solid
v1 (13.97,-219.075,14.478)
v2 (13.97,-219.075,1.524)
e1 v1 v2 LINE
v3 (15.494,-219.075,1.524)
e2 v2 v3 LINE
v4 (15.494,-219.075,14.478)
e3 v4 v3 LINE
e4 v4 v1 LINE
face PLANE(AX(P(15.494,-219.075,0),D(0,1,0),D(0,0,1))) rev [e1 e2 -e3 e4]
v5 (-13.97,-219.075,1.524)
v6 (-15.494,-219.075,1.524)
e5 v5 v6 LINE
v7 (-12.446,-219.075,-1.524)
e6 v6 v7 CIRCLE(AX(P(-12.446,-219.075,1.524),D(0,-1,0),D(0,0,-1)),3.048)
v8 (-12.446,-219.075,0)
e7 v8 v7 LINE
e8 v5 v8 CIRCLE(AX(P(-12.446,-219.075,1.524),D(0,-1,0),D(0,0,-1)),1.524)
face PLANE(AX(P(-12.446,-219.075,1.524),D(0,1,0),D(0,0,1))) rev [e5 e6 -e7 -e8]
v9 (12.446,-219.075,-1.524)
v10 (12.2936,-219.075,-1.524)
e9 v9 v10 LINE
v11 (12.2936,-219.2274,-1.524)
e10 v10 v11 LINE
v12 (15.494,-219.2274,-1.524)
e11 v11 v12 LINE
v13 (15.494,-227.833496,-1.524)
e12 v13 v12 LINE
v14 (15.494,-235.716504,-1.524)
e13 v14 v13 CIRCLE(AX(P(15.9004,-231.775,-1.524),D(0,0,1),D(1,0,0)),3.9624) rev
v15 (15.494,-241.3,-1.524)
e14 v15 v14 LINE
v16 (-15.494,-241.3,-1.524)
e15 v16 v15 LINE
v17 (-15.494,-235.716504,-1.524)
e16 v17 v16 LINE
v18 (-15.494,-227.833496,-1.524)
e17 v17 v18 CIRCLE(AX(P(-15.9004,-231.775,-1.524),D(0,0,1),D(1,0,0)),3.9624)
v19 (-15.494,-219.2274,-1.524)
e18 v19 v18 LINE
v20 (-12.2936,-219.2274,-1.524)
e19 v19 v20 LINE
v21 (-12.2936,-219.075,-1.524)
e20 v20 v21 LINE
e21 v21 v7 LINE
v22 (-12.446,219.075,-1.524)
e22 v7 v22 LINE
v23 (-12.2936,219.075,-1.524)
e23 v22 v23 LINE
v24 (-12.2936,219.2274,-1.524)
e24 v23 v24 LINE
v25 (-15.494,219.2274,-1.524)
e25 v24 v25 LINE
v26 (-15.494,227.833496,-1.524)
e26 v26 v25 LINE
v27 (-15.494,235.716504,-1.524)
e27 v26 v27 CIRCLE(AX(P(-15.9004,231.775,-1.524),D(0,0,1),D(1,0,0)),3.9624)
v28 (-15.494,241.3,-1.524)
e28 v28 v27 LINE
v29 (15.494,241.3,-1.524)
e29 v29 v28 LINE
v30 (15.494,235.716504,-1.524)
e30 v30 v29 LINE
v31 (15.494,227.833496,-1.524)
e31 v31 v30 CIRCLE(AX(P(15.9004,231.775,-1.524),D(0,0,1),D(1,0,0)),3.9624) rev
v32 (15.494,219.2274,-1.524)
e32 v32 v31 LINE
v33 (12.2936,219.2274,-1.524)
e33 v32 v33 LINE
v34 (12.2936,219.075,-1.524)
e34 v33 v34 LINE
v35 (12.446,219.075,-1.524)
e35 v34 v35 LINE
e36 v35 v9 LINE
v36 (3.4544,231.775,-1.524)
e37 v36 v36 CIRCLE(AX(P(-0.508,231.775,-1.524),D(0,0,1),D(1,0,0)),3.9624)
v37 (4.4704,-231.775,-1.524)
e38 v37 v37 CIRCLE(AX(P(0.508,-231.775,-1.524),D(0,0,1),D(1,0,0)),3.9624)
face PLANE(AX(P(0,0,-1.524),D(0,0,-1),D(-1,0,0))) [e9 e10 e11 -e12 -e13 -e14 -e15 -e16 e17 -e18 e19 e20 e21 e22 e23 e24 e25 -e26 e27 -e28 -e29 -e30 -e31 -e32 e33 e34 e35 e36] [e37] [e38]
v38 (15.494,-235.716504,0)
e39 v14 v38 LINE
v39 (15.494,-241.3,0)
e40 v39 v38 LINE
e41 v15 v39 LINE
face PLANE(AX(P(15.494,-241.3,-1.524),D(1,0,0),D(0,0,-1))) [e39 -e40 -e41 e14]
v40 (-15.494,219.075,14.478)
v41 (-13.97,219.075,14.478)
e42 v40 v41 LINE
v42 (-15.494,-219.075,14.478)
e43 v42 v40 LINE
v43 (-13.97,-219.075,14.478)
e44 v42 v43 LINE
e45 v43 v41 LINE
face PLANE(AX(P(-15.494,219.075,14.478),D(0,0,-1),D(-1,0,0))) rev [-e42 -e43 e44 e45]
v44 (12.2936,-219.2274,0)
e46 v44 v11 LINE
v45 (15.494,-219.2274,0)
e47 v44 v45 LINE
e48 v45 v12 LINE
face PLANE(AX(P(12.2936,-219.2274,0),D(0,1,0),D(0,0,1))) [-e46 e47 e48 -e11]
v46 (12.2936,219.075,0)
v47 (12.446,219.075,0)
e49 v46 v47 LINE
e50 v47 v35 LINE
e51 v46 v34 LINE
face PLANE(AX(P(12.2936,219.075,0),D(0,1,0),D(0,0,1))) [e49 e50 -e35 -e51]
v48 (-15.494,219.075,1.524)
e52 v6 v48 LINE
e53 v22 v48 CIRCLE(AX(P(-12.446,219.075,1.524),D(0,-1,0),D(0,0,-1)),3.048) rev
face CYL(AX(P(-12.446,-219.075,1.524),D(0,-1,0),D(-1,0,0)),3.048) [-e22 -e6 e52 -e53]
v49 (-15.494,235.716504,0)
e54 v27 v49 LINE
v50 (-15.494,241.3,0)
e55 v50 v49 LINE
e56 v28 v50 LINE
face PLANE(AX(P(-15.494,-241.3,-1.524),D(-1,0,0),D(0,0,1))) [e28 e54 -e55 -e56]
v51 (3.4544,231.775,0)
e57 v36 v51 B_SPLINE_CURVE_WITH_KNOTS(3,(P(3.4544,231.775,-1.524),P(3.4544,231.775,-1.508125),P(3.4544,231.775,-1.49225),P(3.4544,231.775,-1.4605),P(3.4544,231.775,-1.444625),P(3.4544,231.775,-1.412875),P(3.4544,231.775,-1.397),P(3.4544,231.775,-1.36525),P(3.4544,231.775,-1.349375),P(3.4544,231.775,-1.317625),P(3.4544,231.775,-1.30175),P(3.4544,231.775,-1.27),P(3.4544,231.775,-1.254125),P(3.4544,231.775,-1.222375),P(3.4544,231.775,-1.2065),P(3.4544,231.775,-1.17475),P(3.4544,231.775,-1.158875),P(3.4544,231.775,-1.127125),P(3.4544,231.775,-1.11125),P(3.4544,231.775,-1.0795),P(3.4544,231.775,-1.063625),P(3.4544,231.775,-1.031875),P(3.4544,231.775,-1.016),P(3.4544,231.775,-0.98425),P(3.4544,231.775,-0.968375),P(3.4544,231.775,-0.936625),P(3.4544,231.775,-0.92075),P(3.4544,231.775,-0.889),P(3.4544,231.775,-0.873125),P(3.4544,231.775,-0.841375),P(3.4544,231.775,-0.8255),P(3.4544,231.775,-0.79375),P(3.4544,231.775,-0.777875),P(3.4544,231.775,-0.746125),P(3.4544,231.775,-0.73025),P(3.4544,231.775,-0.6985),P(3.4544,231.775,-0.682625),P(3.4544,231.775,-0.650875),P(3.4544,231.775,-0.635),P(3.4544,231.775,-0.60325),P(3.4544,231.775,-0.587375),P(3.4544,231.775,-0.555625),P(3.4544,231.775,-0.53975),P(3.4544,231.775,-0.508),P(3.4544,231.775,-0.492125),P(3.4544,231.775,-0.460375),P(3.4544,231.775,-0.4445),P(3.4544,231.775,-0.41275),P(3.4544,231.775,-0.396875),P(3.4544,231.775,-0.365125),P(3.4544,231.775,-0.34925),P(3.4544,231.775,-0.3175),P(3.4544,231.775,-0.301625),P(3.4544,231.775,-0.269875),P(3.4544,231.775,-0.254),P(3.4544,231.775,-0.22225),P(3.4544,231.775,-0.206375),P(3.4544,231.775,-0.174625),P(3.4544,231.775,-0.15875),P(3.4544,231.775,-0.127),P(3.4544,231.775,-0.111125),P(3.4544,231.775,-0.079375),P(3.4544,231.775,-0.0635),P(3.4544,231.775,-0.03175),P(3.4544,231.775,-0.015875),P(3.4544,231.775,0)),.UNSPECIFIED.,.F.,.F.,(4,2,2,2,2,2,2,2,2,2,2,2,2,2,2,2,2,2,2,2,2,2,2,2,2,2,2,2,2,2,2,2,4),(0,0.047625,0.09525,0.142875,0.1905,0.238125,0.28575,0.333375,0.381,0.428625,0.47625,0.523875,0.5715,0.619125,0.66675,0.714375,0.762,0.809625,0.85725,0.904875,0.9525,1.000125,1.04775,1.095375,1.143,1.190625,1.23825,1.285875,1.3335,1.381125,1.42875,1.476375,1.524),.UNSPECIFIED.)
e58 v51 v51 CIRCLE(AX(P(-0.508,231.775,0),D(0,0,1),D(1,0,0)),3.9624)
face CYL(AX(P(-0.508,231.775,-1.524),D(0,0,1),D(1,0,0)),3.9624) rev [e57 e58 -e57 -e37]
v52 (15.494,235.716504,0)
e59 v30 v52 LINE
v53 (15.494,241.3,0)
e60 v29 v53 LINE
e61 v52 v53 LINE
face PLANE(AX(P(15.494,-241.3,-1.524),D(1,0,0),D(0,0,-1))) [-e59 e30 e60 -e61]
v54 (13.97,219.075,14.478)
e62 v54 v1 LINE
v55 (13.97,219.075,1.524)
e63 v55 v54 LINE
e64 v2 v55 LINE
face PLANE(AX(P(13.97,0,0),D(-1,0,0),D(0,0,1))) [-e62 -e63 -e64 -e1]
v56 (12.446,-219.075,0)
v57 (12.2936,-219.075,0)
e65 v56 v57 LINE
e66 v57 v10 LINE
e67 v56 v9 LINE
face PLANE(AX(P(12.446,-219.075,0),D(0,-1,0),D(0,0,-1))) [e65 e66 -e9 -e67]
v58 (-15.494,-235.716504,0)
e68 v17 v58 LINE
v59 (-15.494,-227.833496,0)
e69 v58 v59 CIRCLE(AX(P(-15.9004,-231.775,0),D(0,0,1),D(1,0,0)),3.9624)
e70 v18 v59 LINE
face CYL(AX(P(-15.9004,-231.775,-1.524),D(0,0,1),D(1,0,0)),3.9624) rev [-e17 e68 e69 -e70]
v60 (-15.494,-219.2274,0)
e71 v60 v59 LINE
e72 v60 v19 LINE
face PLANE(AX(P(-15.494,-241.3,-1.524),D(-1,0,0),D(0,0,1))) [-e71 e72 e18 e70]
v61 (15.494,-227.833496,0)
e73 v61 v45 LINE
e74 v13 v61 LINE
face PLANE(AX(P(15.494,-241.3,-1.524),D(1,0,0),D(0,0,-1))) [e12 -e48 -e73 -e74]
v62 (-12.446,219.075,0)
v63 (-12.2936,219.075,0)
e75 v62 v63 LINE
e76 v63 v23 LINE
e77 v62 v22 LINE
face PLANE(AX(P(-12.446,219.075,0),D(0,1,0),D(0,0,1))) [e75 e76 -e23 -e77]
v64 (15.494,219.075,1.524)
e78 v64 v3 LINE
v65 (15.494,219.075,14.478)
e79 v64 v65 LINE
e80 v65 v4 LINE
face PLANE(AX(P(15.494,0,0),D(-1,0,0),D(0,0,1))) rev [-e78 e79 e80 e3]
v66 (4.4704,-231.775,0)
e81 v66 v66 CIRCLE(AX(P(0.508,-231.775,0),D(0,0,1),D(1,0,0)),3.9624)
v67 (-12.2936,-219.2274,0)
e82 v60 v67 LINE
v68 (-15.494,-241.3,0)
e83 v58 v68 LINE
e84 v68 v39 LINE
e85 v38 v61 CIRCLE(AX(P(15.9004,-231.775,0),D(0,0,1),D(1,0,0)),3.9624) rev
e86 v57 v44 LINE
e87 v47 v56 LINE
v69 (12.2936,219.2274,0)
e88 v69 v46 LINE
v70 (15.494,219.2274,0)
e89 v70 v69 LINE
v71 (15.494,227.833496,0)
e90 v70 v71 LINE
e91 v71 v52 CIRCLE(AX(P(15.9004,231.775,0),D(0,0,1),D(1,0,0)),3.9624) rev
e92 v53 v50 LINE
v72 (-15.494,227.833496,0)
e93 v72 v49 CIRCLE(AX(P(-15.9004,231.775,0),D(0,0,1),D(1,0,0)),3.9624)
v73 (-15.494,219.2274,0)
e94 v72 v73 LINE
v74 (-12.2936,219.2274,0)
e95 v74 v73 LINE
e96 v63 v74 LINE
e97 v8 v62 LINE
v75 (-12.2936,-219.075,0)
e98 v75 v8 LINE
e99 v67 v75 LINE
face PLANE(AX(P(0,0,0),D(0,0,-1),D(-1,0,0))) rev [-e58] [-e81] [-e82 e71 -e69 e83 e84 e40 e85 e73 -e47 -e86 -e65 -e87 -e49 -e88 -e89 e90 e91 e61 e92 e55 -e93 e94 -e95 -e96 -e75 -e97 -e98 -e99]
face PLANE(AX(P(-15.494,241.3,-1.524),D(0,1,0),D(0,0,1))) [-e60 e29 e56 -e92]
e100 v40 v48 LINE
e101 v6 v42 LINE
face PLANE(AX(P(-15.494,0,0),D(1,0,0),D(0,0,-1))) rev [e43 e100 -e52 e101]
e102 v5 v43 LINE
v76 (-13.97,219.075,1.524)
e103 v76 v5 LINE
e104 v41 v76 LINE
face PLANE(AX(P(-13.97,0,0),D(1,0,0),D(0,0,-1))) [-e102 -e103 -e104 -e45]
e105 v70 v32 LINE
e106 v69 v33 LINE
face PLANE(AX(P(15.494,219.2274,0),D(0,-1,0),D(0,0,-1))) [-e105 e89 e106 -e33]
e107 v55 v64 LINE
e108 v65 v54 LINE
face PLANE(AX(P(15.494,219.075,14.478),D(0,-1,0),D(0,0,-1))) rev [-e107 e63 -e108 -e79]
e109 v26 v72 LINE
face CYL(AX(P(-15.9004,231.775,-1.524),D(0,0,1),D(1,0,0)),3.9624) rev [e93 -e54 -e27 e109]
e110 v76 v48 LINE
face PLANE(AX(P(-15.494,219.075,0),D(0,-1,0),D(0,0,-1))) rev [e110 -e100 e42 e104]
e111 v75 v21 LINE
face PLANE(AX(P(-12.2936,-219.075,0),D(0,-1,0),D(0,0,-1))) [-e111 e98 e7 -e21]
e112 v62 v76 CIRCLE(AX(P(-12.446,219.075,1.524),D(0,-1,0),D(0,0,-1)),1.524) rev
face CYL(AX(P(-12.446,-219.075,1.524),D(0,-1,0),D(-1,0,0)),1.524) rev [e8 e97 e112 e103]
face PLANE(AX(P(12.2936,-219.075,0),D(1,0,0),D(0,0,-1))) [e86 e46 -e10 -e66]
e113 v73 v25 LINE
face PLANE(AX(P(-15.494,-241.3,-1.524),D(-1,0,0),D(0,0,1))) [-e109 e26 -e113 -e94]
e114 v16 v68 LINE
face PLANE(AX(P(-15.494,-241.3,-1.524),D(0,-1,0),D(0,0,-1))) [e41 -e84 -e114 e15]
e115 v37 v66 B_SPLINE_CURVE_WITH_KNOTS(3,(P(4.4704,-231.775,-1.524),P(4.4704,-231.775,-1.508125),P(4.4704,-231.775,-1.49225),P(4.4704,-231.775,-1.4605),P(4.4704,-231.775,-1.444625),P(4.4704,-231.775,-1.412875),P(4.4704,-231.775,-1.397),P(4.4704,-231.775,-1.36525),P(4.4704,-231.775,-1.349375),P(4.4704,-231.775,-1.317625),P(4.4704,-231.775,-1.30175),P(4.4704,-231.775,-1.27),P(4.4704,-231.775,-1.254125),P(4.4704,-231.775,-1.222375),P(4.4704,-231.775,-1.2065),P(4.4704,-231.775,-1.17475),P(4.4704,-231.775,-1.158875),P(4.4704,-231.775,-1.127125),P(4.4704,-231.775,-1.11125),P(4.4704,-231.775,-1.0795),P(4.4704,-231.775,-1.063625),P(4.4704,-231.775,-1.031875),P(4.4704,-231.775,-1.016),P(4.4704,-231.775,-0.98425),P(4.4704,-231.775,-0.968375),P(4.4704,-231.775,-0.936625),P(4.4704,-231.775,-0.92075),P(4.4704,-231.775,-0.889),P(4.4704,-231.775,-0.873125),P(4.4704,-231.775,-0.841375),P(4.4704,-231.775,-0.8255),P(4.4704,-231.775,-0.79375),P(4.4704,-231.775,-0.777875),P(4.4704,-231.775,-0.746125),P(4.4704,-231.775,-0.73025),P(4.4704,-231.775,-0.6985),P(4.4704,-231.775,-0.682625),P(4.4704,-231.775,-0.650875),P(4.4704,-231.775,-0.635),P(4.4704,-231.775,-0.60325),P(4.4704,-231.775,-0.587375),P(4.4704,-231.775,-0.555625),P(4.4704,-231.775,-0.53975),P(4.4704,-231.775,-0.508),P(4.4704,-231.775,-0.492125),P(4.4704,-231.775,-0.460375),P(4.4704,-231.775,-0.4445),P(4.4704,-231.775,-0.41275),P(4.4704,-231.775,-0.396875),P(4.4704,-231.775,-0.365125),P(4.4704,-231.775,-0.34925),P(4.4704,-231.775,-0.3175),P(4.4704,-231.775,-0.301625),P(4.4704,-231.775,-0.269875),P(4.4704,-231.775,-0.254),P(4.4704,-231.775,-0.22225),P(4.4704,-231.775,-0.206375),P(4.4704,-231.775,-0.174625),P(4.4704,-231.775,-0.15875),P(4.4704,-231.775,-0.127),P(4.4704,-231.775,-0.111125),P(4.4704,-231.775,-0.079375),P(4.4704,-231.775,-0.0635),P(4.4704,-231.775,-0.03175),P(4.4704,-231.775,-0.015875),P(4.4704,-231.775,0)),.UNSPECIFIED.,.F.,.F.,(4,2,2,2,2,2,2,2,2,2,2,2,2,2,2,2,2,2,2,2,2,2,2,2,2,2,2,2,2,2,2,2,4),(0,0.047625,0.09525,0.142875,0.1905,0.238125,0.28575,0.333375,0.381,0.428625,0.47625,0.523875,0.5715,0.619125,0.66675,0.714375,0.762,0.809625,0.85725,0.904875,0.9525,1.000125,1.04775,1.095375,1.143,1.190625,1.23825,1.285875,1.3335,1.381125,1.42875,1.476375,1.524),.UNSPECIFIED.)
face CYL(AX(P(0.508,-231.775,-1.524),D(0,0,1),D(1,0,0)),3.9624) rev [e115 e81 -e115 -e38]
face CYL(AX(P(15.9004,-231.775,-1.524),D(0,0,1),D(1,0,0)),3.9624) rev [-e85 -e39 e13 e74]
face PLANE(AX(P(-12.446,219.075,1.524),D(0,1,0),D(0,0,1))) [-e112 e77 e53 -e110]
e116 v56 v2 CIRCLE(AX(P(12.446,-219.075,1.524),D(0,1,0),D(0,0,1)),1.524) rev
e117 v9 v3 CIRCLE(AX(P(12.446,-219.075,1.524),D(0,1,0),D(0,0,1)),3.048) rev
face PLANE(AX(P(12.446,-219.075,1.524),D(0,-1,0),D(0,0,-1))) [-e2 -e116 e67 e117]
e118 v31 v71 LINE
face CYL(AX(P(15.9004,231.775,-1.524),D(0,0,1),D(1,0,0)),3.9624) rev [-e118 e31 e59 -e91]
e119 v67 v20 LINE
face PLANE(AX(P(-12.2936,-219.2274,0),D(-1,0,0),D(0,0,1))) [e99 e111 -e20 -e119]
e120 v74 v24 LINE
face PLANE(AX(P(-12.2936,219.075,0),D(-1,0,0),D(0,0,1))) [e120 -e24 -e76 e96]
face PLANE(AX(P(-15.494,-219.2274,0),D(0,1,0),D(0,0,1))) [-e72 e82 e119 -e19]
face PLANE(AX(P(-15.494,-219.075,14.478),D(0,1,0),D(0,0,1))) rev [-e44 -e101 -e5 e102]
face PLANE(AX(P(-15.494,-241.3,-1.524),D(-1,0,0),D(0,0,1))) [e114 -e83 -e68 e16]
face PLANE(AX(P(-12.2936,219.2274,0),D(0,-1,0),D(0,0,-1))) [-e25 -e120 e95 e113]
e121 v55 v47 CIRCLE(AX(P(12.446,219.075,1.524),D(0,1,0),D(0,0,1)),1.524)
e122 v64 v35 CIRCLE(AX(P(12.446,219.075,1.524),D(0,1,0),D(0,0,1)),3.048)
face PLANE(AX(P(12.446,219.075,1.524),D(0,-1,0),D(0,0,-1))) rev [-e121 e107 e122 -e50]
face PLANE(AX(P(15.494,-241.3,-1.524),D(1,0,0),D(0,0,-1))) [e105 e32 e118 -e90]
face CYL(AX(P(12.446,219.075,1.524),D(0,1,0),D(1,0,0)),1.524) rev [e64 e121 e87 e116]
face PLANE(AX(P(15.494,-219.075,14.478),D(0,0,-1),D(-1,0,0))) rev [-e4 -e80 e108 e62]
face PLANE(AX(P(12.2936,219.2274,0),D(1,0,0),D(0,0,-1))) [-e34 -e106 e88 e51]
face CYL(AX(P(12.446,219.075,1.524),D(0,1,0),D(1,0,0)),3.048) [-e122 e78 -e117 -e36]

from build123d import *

# Parameters (mm, degrees)
CROQUIS1_W                          = 30.988
CROQUIS1_H                          = 482.6
CROQUIS1_R                          = 3.9624
BRIDA_BASE1_DEPTH                   = 1.524
BRIDA_DE_ARISTA1_STRIP_W            = 9.144
BRIDA_DE_ARISTA1_STRIP_H            = 1.524
BRIDA_DE_ARISTA1_STRIP_CUT_DEPTH    = 438.15
BRIDA_DE_ARISTA1_RELIEF_W           = 9.2964
BRIDA_DE_ARISTA1_RELIEF_H           = 0.1524
BRIDA_DE_ARISTA1_RELIEF_CUT_DEPTH   = 1.524
BRIDA_DE_ARISTA1_STRIP_2_W          = 9.144
BRIDA_DE_ARISTA1_STRIP_2_H          = 1.524
BRIDA_DE_ARISTA1_STRIP_CUT_2_DEPTH  = 438.15
BRIDA_DE_ARISTA1_RELIEF_2_W         = 9.2964
BRIDA_DE_ARISTA1_RELIEF_2_H         = 0.1524
BRIDA_DE_ARISTA1_RELIEF_CUT_2_DEPTH = 1.524
BRIDA_DE_ARISTA1_DEPTH              = 438.15
BRIDA_DE_ARISTA1_BEND_DEPTH         = 438.15
CROQUIS15_R                         = 3.9624
CORTAR_EXTRUIR1_DEPTH               = 243.229986831


# Sheet-metal steps are written as plain solids
with BuildPart() as part:
    # Croquis1 → Brida base1 (new body)
    with BuildSketch(Plane.XY):
        Rectangle(CROQUIS1_W, CROQUIS1_H)
        with Locations((-0.508, 231.775)):
            Circle(CROQUIS1_R, mode=Mode.SUBTRACT)
        with Locations((0.508, -231.775)):
            Circle(CROQUIS1_R, mode=Mode.SUBTRACT)
    extrude(amount=-BRIDA_BASE1_DEPTH)

    # Brida de arista1 strip (across the edge) → Brida de arista1 strip cut (cut)
    with BuildSketch(Plane(origin=(15.494, -219.075, 0), x_dir=(-1, 0, 0), z_dir=(0, 1, 0))):
        with Locations((-1.524, -0.762)):
            Rectangle(BRIDA_DE_ARISTA1_STRIP_W, BRIDA_DE_ARISTA1_STRIP_H)
    extrude(amount=BRIDA_DE_ARISTA1_STRIP_CUT_DEPTH, mode=Mode.SUBTRACT)

    # Brida de arista1 relief (on the sheet) → Brida de arista1 relief cut (cut)
    with BuildSketch(Plane(origin=(12.446, -219.075, 0), x_dir=(-1, 0, 0), z_dir=(0, 0, 1))):
        with Locations((-4.4958, 0.0762)):
            Rectangle(BRIDA_DE_ARISTA1_RELIEF_W, BRIDA_DE_ARISTA1_RELIEF_H)
        with Locations((-4.4958, -438.2262)):
            Rectangle(BRIDA_DE_ARISTA1_RELIEF_W, BRIDA_DE_ARISTA1_RELIEF_H)
    extrude(amount=-BRIDA_DE_ARISTA1_RELIEF_CUT_DEPTH, mode=Mode.SUBTRACT)

    # Brida de arista1 strip 2 (across the edge) → Brida de arista1 strip cut 2 (cut)
    with BuildSketch(Plane(origin=(-15.494, 219.075, 0), x_dir=(1, 0, 0), z_dir=(0, -1, 0))):
        with Locations((-1.524, -0.762)):
            Rectangle(BRIDA_DE_ARISTA1_STRIP_2_W, BRIDA_DE_ARISTA1_STRIP_2_H)
    extrude(amount=BRIDA_DE_ARISTA1_STRIP_CUT_2_DEPTH, mode=Mode.SUBTRACT)

    # Brida de arista1 relief 2 (on the sheet) → Brida de arista1 relief cut 2 (cut)
    with BuildSketch(Plane(origin=(-12.446, 219.075, 0), x_dir=(1, 0, 0), z_dir=(0, 0, 1))):
        with Locations((-4.4958, 0.0762)):
            Rectangle(BRIDA_DE_ARISTA1_RELIEF_2_W, BRIDA_DE_ARISTA1_RELIEF_2_H)
        with Locations((-4.4958, -438.2262)):
            Rectangle(BRIDA_DE_ARISTA1_RELIEF_2_W, BRIDA_DE_ARISTA1_RELIEF_2_H)
    extrude(amount=-BRIDA_DE_ARISTA1_RELIEF_CUT_2_DEPTH, mode=Mode.SUBTRACT)

    # Brida de arista1 section (across the edge) → Brida de arista1 (add)
    with BuildSketch(Plane(origin=(15.494, -219.075, 0), x_dir=(-1, 0, 0), z_dir=(0, 1, 0))):
        with BuildLine():
            Line((0, 1.524), (0, 14.478))
            Line((0, 14.478), (1.524, 14.478))
            Line((1.524, 14.478), (1.524, 1.524))
            ThreePointArc((1.524, 1.524), (1.970369265, 0.446369265), (3.048, 0))
            Line((3.048, 0), (3.048, -1.524))
            ThreePointArc((3.048, -1.524), (0.892738531, -0.631261469), (0, 1.524))
        make_face()
    extrude(amount=BRIDA_DE_ARISTA1_DEPTH)

    # Brida de arista1 section 2 (across the edge) → Brida de arista1 bend (add)
    with BuildSketch(Plane(origin=(-15.494, 219.075, 0), x_dir=(1, 0, 0), z_dir=(0, -1, 0))):
        with BuildLine():
            Line((0, 1.524), (0, 14.478))
            Line((0, 14.478), (1.524, 14.478))
            Line((1.524, 14.478), (1.524, 1.524))
            ThreePointArc((1.524, 1.524), (1.970369265, 0.446369265), (3.048, 0))
            Line((3.048, 0), (3.048, -1.524))
            ThreePointArc((3.048, -1.524), (0.892738531, -0.631261469), (0, 1.524))
        make_face()
    extrude(amount=BRIDA_DE_ARISTA1_BEND_DEPTH)

    # Croquis15 → Cortar-Extruir1 (cut, through all)
    with BuildSketch(Plane.XY):
        with Locations((-15.9004, 231.775)):
            Circle(CROQUIS15_R)
        with Locations((-15.9004, -231.775)):
            Circle(CROQUIS15_R)
        with Locations((15.9004, -231.775)):
            Circle(CROQUIS15_R)
        with Locations((15.9004, 231.775)):
            Circle(CROQUIS15_R)
    extrude(amount=-CORTAR_EXTRUIR1_DEPTH, mode=Mode.SUBTRACT)


solid = part.part
